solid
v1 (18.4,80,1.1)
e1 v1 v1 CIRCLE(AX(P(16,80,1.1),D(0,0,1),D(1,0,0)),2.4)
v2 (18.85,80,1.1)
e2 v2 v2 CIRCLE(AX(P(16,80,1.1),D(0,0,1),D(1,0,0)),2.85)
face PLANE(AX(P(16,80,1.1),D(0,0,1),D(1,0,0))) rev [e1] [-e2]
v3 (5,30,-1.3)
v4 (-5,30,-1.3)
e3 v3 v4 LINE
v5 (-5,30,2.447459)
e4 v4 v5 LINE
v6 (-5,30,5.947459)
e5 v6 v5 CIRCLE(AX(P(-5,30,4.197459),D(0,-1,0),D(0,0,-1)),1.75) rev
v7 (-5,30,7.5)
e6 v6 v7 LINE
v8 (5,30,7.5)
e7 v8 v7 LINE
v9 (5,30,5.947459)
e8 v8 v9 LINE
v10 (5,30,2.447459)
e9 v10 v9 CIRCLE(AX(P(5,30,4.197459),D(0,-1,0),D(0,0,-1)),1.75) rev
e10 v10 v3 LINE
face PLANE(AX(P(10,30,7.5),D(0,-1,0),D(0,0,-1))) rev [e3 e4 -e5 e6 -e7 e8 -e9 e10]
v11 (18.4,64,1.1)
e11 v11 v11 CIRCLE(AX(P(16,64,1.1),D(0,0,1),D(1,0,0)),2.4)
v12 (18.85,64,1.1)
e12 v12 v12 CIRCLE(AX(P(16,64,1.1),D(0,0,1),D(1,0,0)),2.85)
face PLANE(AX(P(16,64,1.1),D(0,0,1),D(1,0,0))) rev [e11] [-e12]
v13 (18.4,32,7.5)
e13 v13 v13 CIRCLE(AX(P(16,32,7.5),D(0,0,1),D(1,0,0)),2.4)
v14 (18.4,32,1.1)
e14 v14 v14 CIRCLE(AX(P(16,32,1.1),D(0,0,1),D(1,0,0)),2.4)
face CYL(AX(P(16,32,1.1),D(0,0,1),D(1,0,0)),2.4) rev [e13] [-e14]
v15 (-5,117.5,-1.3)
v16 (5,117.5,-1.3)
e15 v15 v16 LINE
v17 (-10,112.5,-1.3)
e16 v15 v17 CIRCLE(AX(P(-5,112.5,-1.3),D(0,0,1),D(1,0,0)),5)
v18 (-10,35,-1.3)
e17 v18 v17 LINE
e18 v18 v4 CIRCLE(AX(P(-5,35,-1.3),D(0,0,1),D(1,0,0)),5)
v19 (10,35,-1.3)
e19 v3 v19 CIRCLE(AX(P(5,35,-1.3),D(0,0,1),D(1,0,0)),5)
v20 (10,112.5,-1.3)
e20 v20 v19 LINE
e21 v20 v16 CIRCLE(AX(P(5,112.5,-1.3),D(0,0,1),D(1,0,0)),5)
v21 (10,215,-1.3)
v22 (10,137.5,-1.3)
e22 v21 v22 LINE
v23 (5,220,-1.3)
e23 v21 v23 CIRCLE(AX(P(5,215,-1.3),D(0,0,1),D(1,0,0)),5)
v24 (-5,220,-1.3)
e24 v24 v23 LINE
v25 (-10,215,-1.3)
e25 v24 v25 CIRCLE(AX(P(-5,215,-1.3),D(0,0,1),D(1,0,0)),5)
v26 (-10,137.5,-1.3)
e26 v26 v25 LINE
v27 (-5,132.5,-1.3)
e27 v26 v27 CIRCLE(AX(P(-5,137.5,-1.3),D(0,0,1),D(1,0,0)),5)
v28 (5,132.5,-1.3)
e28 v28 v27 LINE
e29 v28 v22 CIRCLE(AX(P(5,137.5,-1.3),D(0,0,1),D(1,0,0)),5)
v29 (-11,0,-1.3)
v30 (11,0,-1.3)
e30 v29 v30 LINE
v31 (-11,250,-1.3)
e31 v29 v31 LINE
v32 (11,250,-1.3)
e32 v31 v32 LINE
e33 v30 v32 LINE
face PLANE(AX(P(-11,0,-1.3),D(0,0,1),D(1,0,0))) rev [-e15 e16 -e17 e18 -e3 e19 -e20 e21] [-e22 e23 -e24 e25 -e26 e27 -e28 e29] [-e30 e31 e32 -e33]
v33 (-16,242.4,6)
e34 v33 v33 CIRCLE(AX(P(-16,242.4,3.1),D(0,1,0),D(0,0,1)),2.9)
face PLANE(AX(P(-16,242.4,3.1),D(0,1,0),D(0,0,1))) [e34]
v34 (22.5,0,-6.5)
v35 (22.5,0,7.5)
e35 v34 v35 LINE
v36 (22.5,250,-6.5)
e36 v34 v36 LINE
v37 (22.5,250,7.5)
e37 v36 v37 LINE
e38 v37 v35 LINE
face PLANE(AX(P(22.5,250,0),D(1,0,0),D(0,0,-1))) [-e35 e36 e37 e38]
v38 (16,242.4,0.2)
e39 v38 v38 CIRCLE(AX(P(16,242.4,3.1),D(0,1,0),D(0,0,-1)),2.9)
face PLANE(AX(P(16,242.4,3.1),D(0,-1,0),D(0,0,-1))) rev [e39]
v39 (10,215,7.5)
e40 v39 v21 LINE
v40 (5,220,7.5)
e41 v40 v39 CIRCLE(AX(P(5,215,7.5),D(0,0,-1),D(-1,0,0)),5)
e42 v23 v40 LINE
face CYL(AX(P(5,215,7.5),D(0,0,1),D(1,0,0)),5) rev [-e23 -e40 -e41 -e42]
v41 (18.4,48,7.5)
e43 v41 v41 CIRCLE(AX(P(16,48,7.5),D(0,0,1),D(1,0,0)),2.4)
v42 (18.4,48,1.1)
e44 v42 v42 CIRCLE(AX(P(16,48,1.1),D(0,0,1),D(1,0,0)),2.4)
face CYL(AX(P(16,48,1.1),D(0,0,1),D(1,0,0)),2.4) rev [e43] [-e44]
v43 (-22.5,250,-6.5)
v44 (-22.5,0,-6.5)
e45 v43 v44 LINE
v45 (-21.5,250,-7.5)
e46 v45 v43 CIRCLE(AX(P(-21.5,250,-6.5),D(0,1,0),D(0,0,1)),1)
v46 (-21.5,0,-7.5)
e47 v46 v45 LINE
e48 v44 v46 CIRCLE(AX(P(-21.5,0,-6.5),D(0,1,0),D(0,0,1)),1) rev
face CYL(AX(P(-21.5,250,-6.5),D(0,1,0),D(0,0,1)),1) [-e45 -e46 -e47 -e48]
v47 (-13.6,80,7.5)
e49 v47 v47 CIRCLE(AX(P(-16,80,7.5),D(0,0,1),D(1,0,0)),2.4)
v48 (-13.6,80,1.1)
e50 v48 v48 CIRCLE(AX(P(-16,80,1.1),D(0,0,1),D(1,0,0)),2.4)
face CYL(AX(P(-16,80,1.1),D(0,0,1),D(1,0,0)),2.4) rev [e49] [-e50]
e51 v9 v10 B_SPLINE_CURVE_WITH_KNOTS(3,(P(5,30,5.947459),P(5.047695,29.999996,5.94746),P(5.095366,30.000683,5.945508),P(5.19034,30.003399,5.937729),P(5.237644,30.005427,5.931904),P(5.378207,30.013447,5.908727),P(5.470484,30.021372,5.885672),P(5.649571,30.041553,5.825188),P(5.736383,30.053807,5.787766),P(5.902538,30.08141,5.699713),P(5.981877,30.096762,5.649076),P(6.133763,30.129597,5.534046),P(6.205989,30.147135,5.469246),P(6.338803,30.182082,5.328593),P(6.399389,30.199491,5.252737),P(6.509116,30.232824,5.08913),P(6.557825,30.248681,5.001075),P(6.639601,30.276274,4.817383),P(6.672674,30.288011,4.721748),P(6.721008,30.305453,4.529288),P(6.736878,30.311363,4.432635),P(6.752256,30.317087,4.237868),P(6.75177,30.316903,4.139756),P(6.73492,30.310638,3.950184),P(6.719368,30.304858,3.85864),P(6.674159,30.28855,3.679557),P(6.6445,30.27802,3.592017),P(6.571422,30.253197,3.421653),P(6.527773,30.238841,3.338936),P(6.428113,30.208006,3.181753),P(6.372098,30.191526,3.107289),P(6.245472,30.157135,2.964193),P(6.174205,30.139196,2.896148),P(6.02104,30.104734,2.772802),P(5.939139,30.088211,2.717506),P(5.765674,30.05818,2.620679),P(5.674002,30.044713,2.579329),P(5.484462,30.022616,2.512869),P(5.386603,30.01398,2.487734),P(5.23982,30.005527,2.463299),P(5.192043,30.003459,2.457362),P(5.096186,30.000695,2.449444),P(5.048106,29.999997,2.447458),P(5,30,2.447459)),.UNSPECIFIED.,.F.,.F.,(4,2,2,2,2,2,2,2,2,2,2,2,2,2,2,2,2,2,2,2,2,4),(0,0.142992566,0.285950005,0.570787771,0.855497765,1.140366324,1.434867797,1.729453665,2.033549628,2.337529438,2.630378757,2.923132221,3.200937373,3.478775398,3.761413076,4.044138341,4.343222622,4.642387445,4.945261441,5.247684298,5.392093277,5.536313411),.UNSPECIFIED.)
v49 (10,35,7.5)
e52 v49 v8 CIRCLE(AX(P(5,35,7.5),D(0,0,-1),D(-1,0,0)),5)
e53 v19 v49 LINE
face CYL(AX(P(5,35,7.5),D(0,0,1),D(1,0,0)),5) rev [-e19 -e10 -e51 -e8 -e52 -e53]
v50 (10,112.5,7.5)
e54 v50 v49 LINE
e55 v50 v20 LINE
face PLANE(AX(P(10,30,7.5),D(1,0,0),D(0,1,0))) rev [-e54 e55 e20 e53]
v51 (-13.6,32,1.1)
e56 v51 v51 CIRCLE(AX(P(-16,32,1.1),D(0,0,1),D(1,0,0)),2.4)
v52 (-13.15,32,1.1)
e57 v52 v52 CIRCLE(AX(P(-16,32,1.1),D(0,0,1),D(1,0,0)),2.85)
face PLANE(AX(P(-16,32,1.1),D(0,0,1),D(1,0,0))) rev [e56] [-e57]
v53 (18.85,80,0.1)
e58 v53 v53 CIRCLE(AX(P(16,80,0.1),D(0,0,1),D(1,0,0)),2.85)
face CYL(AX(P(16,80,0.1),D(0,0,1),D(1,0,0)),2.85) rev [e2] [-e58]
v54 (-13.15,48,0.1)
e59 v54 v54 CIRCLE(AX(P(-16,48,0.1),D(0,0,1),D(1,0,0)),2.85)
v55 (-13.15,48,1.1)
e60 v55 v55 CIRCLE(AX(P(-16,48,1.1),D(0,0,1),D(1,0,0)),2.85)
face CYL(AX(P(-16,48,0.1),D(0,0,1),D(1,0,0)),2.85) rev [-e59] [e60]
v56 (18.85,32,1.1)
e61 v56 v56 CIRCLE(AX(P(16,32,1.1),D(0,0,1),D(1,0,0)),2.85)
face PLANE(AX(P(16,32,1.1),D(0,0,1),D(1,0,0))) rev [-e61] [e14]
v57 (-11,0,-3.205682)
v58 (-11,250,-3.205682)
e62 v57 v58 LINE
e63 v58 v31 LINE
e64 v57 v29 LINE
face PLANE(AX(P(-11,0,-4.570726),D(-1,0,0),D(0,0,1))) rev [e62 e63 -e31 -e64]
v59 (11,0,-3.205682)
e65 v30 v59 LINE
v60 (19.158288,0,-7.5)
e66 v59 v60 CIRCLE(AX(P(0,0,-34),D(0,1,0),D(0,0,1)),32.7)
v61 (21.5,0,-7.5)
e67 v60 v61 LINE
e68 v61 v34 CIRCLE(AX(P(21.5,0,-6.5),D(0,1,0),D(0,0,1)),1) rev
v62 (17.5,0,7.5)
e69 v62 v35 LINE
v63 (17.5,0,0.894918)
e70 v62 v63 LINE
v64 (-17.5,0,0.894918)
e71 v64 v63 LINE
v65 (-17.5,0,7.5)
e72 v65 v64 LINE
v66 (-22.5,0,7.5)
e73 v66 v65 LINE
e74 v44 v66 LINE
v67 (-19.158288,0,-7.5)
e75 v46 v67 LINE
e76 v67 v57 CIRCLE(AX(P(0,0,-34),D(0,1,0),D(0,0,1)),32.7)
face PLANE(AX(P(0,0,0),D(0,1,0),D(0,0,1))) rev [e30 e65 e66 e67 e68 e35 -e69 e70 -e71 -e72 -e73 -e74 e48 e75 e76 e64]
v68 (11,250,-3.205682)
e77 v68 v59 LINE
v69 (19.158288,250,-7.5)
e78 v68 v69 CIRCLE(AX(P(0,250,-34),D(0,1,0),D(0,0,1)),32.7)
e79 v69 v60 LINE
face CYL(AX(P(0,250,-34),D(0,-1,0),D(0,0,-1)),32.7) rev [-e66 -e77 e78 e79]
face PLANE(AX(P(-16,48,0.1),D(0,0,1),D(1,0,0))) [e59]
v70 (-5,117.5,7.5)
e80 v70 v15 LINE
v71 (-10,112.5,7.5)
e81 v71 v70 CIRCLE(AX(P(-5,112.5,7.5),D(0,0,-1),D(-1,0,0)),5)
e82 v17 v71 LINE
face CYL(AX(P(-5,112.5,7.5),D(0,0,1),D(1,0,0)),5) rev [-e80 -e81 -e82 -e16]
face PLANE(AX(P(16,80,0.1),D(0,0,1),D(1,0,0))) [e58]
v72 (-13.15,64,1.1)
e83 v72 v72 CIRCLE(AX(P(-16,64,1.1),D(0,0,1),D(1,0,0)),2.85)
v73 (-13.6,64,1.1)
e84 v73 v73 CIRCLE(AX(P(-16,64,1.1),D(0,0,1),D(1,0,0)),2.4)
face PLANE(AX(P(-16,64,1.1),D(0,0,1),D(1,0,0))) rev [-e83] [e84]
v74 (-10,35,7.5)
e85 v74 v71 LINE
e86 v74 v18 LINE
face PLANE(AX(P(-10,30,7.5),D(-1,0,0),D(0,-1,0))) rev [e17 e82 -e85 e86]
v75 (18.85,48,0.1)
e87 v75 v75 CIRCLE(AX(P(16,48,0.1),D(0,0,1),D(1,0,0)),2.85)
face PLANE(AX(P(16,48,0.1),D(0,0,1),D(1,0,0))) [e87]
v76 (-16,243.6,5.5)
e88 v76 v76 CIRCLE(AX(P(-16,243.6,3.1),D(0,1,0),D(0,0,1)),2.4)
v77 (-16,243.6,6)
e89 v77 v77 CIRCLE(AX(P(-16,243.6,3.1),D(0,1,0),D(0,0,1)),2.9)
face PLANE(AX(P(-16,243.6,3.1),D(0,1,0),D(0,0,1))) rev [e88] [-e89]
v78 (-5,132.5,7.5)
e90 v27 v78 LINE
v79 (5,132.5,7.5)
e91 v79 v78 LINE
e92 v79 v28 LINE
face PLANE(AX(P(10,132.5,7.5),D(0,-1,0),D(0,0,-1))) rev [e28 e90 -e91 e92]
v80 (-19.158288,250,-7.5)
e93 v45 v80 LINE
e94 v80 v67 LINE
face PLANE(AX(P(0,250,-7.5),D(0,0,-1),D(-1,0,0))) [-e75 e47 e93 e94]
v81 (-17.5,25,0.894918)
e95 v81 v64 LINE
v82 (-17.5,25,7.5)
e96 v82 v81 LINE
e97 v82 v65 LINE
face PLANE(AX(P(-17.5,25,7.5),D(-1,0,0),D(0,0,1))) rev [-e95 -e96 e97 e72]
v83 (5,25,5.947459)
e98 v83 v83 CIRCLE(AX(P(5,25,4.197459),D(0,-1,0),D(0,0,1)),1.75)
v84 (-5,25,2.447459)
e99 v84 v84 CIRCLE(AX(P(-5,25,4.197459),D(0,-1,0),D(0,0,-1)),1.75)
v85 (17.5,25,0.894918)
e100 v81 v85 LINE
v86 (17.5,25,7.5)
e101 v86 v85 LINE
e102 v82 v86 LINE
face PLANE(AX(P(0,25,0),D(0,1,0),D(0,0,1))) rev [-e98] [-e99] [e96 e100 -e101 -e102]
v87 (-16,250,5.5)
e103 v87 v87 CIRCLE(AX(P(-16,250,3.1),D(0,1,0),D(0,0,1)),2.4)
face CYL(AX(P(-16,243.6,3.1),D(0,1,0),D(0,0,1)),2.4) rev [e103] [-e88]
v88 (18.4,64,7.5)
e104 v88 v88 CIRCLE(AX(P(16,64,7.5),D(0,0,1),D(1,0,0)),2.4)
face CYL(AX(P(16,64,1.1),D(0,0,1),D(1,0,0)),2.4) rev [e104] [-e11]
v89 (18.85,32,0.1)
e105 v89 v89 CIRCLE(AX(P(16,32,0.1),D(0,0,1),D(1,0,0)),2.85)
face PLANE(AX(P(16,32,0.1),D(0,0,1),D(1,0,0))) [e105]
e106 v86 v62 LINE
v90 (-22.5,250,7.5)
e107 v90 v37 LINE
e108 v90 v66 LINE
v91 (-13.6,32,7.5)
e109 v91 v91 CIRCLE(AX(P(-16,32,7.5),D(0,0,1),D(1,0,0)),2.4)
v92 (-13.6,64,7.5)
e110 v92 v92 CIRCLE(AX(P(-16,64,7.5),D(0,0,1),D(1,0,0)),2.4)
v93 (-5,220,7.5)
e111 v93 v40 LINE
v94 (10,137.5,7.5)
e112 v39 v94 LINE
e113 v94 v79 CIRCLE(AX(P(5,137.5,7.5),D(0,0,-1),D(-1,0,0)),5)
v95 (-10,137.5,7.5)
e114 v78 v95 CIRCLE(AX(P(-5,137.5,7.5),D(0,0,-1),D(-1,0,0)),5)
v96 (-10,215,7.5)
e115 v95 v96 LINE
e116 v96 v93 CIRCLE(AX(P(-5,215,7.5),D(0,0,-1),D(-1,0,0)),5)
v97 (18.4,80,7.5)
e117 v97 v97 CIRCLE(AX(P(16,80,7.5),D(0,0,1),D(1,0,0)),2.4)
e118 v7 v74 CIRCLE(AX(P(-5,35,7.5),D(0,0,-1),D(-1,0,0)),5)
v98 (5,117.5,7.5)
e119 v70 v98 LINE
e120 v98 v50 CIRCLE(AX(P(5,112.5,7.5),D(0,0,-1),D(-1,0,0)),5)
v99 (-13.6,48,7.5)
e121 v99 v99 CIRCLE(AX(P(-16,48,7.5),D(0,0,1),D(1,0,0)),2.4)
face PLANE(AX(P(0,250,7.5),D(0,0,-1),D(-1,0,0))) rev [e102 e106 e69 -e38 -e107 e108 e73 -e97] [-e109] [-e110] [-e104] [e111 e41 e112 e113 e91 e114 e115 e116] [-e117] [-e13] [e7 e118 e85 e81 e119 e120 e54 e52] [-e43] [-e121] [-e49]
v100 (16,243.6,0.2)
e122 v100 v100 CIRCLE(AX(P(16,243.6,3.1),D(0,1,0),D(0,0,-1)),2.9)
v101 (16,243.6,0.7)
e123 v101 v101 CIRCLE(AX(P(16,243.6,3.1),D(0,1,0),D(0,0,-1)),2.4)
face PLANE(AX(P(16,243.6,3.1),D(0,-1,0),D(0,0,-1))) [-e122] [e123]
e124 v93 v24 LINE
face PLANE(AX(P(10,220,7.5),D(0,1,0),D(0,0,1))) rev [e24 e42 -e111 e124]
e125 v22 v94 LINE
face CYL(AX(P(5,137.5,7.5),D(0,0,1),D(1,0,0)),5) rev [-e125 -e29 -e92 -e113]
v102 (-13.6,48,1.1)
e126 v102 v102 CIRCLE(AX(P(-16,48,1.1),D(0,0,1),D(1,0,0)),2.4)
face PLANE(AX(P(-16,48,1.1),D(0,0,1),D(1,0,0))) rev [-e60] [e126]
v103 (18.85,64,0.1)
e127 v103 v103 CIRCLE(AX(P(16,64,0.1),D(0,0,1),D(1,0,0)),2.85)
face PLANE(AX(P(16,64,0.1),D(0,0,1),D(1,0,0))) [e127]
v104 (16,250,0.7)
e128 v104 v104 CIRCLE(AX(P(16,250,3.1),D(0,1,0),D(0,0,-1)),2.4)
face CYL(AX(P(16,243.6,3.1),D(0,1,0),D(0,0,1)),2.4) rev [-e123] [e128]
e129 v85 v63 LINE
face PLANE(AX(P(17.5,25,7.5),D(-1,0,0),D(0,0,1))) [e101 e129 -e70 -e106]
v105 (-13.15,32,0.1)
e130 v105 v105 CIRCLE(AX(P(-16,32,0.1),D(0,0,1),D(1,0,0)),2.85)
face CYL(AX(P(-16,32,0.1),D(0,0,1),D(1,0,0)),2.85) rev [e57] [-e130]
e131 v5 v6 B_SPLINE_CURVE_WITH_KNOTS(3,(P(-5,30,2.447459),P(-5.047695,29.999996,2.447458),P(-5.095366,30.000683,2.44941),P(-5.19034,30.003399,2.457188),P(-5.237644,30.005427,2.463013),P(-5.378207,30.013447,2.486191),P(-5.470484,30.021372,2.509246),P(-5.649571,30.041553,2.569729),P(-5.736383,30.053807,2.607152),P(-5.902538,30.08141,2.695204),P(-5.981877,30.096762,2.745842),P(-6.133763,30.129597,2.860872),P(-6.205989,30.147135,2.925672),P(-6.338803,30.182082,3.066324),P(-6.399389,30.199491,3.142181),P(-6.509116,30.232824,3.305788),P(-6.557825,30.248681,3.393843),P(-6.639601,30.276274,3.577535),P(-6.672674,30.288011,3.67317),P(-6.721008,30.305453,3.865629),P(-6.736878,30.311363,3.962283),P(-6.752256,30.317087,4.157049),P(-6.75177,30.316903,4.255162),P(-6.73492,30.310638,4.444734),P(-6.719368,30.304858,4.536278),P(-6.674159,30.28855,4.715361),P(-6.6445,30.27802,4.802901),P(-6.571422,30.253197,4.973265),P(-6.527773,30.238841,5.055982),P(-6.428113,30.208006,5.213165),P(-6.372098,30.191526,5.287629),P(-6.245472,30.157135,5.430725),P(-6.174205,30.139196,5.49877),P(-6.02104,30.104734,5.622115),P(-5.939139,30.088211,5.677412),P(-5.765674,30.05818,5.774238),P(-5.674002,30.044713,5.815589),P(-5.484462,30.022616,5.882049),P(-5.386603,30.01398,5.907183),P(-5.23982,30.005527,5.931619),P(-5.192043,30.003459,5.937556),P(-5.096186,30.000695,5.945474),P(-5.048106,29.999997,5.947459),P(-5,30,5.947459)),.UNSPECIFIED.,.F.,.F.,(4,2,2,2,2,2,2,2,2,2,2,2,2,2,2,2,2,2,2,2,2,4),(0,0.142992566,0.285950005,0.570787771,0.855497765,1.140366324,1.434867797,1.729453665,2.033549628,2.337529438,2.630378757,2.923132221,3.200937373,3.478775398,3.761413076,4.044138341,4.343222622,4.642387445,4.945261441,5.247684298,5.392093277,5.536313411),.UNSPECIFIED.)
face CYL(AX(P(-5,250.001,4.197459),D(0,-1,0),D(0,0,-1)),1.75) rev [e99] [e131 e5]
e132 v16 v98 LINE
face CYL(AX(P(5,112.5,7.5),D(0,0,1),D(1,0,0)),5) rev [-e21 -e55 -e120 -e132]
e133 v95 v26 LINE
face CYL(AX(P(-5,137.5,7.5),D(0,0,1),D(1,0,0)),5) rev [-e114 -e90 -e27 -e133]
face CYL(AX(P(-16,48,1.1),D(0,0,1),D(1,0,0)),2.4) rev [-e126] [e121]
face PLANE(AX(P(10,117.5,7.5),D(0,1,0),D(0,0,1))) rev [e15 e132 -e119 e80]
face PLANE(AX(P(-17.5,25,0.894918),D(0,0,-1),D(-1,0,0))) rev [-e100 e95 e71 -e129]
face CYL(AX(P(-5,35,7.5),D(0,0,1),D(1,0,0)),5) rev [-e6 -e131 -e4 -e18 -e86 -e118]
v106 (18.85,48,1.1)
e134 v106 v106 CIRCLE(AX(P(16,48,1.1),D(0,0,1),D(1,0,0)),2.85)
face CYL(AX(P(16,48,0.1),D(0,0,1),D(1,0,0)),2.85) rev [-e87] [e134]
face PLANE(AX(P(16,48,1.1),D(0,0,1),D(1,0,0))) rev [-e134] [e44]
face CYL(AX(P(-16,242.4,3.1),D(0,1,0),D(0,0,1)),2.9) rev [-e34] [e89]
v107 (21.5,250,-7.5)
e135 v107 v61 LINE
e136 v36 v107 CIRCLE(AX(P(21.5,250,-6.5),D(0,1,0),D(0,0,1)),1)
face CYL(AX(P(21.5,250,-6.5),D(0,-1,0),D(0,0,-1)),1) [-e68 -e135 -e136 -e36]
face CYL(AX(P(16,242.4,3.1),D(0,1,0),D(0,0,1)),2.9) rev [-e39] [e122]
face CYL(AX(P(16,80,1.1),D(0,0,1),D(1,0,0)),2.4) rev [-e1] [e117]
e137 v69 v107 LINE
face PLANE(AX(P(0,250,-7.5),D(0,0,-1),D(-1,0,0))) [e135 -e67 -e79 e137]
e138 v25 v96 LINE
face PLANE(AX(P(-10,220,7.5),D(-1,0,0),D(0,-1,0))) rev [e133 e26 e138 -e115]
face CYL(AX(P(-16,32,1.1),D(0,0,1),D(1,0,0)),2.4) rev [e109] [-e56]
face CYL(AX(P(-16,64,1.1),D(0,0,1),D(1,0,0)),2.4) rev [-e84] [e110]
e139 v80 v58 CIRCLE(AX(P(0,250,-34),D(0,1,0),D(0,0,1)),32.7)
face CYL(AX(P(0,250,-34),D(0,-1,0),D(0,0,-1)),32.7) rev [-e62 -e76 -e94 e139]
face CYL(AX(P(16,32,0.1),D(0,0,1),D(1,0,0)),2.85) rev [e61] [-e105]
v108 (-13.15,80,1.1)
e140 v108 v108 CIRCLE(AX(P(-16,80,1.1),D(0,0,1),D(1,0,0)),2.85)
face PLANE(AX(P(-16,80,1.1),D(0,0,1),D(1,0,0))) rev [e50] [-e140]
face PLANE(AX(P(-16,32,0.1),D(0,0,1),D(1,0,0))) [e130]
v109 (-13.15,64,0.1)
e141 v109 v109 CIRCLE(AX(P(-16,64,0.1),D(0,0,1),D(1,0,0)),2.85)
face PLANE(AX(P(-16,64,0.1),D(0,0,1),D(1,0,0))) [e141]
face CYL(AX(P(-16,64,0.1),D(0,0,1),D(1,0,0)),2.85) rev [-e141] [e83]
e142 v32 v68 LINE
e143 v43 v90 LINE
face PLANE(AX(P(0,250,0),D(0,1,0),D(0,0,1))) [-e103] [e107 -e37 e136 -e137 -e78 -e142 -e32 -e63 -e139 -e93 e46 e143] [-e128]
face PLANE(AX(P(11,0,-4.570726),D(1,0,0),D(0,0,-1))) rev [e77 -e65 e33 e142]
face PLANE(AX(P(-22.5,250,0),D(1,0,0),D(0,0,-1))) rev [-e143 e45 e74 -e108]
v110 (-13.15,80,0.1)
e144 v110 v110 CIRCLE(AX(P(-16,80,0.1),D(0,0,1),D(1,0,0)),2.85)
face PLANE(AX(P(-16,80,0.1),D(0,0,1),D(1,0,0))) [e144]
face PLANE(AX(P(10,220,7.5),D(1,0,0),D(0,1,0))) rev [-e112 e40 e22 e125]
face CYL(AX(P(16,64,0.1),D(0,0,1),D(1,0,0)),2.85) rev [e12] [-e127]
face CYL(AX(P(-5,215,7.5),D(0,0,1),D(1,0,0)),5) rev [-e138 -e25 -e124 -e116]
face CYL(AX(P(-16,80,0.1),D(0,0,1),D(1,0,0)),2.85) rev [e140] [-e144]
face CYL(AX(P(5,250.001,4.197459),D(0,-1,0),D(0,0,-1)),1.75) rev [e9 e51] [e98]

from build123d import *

# Parameters (mm, degrees)
RUNDUNG_DEPTH                    = 250
SKIZZE2_W                        = 22
SKIZZE2_H                        = 3.270726357
AUSSPARUNGLAUF_DEPTH             = 252.122480077
SKIZZE4_W                        = 20
SKIZZE4_H                        = 87.5
SCHNITT_LINEAR_AUSTRAGEN2_DEPTH  = 252.164667101
SKIZZE5_R                        = 2.4
SCHNITT_LINEAR_AUSTRAGEN4_DEPTH  = 6.4
SKIZZE6_R                        = 2.85
SCHNITT_LINEAR_AUSTRAGEN5_DEPTH  = 1
SKIZZE9_W                        = 35
SKIZZE9_H                        = 6.605082277
SCHNITT_LINEAR_AUSTRAGEN9_DEPTH  = 25
SCHNITT_LINEAR_AUSTRAGEN10_REACH = 228.247
SKIZZE12_R                       = 1.75
SKIZZE14_R                       = 2.4
SCHNITT_LINEAR_AUSTRAGEN11_DEPTH = 6.4
SKIZZE15_R                       = 2.9
SCHNITT_LINEAR_AUSTRAGEN12_DEPTH = 1.2
VERRUNDUNG1_R                    = 5
VERRUNDUNG2_R                    = 1


with BuildPart() as part:
    # Skizze1 → Rundung (new body)
    with BuildSketch(Plane(origin=(0, 0, 0), x_dir=(1, 0, 0), z_dir=(0, 1, 0))):
        with BuildLine():
            Line((-19.158288024, 7.5), (-22.5, 7.5))
            Line((-22.5, 7.5), (-22.5, -7.5))
            Line((-22.5, -7.5), (22.5, -7.5))
            Line((22.5, -7.5), (22.5, 7.5))
            Line((22.5, 7.5), (19.158288024, 7.5))
            ThreePointArc((19.158288024, 7.5), (0, 1.3), (-19.158288024, 7.5))
        make_face()
    extrude(amount=RUNDUNG_DEPTH)

    # Skizze2 → AussparungLauf (cut, through all)
    with BuildSketch(Plane(origin=(0, 250, 0), x_dir=(1, 0, 0), z_dir=(0, 1, 0))):
        with Locations((0, 2.935363178)):
            Rectangle(SKIZZE2_W, SKIZZE2_H)
    extrude(amount=-AUSSPARUNGLAUF_DEPTH, mode=Mode.SUBTRACT)

    # Skizze4 → Schnitt-Linear austragen2 (cut, through all)
    with BuildSketch(Plane(origin=(0, 0, -1.3), x_dir=(-1, 0, 0), z_dir=(0, 0, -1))):
        with Locations((0, 73.75)):
            Rectangle(SKIZZE4_W, SKIZZE4_H)
        with Locations((0, 176.25)):
            Rectangle(SKIZZE4_W, SKIZZE4_H)
    extrude(amount=-SCHNITT_LINEAR_AUSTRAGEN2_DEPTH, mode=Mode.SUBTRACT)

    # Skizze5 → Schnitt-Linear austragen4 (cut)
    with BuildSketch(Plane.XY.offset(7.5)):
        with Locations((-16, 32)):
            Circle(SKIZZE5_R)
        with Locations((16, 32)):
            Circle(SKIZZE5_R)
        with Locations((16, 48)):
            Circle(SKIZZE5_R)
        with Locations((16, 64)):
            Circle(SKIZZE5_R)
        with Locations((16, 80)):
            Circle(SKIZZE5_R)
        with Locations((-16, 48)):
            Circle(SKIZZE5_R)
        with Locations((-16, 64)):
            Circle(SKIZZE5_R)
        with Locations((-16, 80)):
            Circle(SKIZZE5_R)
    extrude(amount=-SCHNITT_LINEAR_AUSTRAGEN4_DEPTH, mode=Mode.SUBTRACT)

    # Skizze6 → Schnitt-Linear austragen5 (cut)
    with BuildSketch(Plane.XY.offset(1.1)):
        with Locations((-16, 32)):
            Circle(SKIZZE6_R)
        with Locations((16, 32)):
            Circle(SKIZZE6_R)
        with Locations((16, 48)):
            Circle(SKIZZE6_R)
        with Locations((16, 64)):
            Circle(SKIZZE6_R)
        with Locations((16, 80)):
            Circle(SKIZZE6_R)
        with Locations((-16, 48)):
            Circle(SKIZZE6_R)
        with Locations((-16, 64)):
            Circle(SKIZZE6_R)
        with Locations((-16, 80)):
            Circle(SKIZZE6_R)
    extrude(amount=-SCHNITT_LINEAR_AUSTRAGEN5_DEPTH, mode=Mode.SUBTRACT)

    # Skizze9 → Schnitt-Linear austragen9 (cut)
    with BuildSketch(Plane.XZ):
        with Locations((0, 4.197458862)):
            Rectangle(SKIZZE9_W, SKIZZE9_H)
    extrude(amount=-SCHNITT_LINEAR_AUSTRAGEN9_DEPTH, mode=Mode.SUBTRACT)

    # Skizze12 → Schnitt-Linear austragen10 (cut, up to next)
    with BuildSketch(Plane.XZ.offset(-25), mode=Mode.PRIVATE) as schnitt_linear_austragen10_sk1:
        with Locations(Location((-5, 4.197458861, 0), (0, 0, 270))):
            Circle(SKIZZE12_R)
    schnitt_linear_austragen10_tool1 = extrude(schnitt_linear_austragen10_sk1.sketch, amount=-SCHNITT_LINEAR_AUSTRAGEN10_REACH, mode=Mode.PRIVATE) & part.part
    # Skizze12 → Schnitt-Linear austragen10 (cut, up to next)
    with BuildSketch(Plane.XZ.offset(-25), mode=Mode.PRIVATE) as schnitt_linear_austragen10_sk2:
        with Locations(Location((5, 4.197458861, 0), (0, 0, 270))):
            Circle(SKIZZE12_R)
    schnitt_linear_austragen10_tool2 = extrude(schnitt_linear_austragen10_sk2.sketch, amount=-SCHNITT_LINEAR_AUSTRAGEN10_REACH, mode=Mode.PRIVATE) & part.part
    add(schnitt_linear_austragen10_tool1.solids().sort_by_distance((-5, 25, 4.197459))[0], mode=Mode.SUBTRACT)
    add(schnitt_linear_austragen10_tool2.solids().sort_by_distance((5, 25, 4.197459))[0], mode=Mode.SUBTRACT)

    # Skizze14 → Schnitt-Linear austragen11 (cut)
    with BuildSketch(Plane(origin=(0, 250, 0), x_dir=(1, 0, 0), z_dir=(0, 1, 0))):
        with Locations(Location((-16, -3.1, 0), (0, 0, 270))):
            Circle(SKIZZE14_R)
        with Locations(Location((16, -3.1, 0), (0, 0, 90))):
            Circle(SKIZZE14_R)
    extrude(amount=-SCHNITT_LINEAR_AUSTRAGEN11_DEPTH, mode=Mode.SUBTRACT)

    # Skizze15 → Schnitt-Linear austragen12 (cut)
    with BuildSketch(Plane(origin=(0, 243.6, 0), x_dir=(1, 0, 0), z_dir=(0, 1, 0))):
        with Locations(Location((-16, -3.1, 0), (0, 0, 270))):
            Circle(SKIZZE15_R)
        with Locations(Location((16, -3.1, 0), (0, 0, 90))):
            Circle(SKIZZE15_R)
    extrude(amount=-SCHNITT_LINEAR_AUSTRAGEN12_DEPTH, mode=Mode.SUBTRACT)

    # Verrundung1
    # the kernel refuses this fillet: 5 mm, written as the material it adds along each edge
    with BuildSketch(Plane(origin=(10, 132.5, -1.3), x_dir=(0, 1, 0), z_dir=(0, 0, 1)), Plane(origin=(-10, 132.5, -1.3), x_dir=(1, 0, 0), z_dir=(0, 0, 1))) as verrundung1_piece_1:
        with BuildLine():
            CenterArc((VERRUNDUNG1_R, VERRUNDUNG1_R), VERRUNDUNG1_R, 180, 90)
            Line((0, VERRUNDUNG1_R), (0, 0))
            Line((0, 0), (VERRUNDUNG1_R, 0))
        make_face()
    extrude(amount=8.8)
    with BuildSketch(Plane(origin=(10, 220, -1.3), x_dir=(0, -1, 0), z_dir=(0, 0, 1)), Plane(origin=(-10, 220, -1.3), x_dir=(1, 0, 0), z_dir=(0, 0, 1)), Plane(origin=(10, 117.5, -1.3), x_dir=(0, -1, 0), z_dir=(0, 0, 1)), Plane(origin=(-10, 117.5, -1.3), x_dir=(1, 0, 0), z_dir=(0, 0, 1))) as verrundung1_piece_2:
        with BuildLine():
            CenterArc((VERRUNDUNG1_R, -VERRUNDUNG1_R), VERRUNDUNG1_R, 90, 90)
            Line((0, -VERRUNDUNG1_R), (0, 0))
            Line((0, 0), (VERRUNDUNG1_R, 0))
        make_face()
    extrude(amount=8.8)
    with BuildSketch(Plane(origin=(10, 30, -1.3), x_dir=(0, 1, 0), z_dir=(0, 0, 1))) as verrundung1_piece_3_section:
        with BuildLine():
            CenterArc((VERRUNDUNG1_R, VERRUNDUNG1_R), VERRUNDUNG1_R, 180, 90)
            Line((0, VERRUNDUNG1_R), (0, 0))
            Line((0, 0), (VERRUNDUNG1_R, 0))
        make_face()
    verrundung1_piece_3 = extrude(amount=8.8, mode=Mode.PRIVATE)
    verrundung1_piece_3 = verrundung1_piece_3 - Plane(origin=(5, 31.149403534, 4.197458861), x_dir=(0, 0, -1), z_dir=(0, -1, 0)) * Cylinder(1.75, 38, mode=Mode.PRIVATE)
    add(verrundung1_piece_3)
    with BuildSketch(Plane(origin=(-10, 30, -1.3), x_dir=(1, 0, 0), z_dir=(0, 0, 1))) as verrundung1_piece_4_section:
        with BuildLine():
            CenterArc((VERRUNDUNG1_R, VERRUNDUNG1_R), VERRUNDUNG1_R, 180, 90)
            Line((0, VERRUNDUNG1_R), (0, 0))
            Line((0, 0), (VERRUNDUNG1_R, 0))
        make_face()
    verrundung1_piece_4 = extrude(amount=8.8, mode=Mode.PRIVATE)
    verrundung1_piece_4 = verrundung1_piece_4 - Plane(origin=(-5, 31.149403677, 4.197458861), x_dir=(0, 0, -1), z_dir=(0, -1, 0)) * Cylinder(1.75, 38, mode=Mode.PRIVATE)
    add(verrundung1_piece_4)

    # Verrundung2
    verrundung2_edges = [part.edges().sort_by_distance(p)[0] for p in [
        (22.5, 125, -7.5),
        (-22.5, 125, -7.5),
    ]]
    fillet(verrundung2_edges, radius=VERRUNDUNG2_R)


solid = part.part
